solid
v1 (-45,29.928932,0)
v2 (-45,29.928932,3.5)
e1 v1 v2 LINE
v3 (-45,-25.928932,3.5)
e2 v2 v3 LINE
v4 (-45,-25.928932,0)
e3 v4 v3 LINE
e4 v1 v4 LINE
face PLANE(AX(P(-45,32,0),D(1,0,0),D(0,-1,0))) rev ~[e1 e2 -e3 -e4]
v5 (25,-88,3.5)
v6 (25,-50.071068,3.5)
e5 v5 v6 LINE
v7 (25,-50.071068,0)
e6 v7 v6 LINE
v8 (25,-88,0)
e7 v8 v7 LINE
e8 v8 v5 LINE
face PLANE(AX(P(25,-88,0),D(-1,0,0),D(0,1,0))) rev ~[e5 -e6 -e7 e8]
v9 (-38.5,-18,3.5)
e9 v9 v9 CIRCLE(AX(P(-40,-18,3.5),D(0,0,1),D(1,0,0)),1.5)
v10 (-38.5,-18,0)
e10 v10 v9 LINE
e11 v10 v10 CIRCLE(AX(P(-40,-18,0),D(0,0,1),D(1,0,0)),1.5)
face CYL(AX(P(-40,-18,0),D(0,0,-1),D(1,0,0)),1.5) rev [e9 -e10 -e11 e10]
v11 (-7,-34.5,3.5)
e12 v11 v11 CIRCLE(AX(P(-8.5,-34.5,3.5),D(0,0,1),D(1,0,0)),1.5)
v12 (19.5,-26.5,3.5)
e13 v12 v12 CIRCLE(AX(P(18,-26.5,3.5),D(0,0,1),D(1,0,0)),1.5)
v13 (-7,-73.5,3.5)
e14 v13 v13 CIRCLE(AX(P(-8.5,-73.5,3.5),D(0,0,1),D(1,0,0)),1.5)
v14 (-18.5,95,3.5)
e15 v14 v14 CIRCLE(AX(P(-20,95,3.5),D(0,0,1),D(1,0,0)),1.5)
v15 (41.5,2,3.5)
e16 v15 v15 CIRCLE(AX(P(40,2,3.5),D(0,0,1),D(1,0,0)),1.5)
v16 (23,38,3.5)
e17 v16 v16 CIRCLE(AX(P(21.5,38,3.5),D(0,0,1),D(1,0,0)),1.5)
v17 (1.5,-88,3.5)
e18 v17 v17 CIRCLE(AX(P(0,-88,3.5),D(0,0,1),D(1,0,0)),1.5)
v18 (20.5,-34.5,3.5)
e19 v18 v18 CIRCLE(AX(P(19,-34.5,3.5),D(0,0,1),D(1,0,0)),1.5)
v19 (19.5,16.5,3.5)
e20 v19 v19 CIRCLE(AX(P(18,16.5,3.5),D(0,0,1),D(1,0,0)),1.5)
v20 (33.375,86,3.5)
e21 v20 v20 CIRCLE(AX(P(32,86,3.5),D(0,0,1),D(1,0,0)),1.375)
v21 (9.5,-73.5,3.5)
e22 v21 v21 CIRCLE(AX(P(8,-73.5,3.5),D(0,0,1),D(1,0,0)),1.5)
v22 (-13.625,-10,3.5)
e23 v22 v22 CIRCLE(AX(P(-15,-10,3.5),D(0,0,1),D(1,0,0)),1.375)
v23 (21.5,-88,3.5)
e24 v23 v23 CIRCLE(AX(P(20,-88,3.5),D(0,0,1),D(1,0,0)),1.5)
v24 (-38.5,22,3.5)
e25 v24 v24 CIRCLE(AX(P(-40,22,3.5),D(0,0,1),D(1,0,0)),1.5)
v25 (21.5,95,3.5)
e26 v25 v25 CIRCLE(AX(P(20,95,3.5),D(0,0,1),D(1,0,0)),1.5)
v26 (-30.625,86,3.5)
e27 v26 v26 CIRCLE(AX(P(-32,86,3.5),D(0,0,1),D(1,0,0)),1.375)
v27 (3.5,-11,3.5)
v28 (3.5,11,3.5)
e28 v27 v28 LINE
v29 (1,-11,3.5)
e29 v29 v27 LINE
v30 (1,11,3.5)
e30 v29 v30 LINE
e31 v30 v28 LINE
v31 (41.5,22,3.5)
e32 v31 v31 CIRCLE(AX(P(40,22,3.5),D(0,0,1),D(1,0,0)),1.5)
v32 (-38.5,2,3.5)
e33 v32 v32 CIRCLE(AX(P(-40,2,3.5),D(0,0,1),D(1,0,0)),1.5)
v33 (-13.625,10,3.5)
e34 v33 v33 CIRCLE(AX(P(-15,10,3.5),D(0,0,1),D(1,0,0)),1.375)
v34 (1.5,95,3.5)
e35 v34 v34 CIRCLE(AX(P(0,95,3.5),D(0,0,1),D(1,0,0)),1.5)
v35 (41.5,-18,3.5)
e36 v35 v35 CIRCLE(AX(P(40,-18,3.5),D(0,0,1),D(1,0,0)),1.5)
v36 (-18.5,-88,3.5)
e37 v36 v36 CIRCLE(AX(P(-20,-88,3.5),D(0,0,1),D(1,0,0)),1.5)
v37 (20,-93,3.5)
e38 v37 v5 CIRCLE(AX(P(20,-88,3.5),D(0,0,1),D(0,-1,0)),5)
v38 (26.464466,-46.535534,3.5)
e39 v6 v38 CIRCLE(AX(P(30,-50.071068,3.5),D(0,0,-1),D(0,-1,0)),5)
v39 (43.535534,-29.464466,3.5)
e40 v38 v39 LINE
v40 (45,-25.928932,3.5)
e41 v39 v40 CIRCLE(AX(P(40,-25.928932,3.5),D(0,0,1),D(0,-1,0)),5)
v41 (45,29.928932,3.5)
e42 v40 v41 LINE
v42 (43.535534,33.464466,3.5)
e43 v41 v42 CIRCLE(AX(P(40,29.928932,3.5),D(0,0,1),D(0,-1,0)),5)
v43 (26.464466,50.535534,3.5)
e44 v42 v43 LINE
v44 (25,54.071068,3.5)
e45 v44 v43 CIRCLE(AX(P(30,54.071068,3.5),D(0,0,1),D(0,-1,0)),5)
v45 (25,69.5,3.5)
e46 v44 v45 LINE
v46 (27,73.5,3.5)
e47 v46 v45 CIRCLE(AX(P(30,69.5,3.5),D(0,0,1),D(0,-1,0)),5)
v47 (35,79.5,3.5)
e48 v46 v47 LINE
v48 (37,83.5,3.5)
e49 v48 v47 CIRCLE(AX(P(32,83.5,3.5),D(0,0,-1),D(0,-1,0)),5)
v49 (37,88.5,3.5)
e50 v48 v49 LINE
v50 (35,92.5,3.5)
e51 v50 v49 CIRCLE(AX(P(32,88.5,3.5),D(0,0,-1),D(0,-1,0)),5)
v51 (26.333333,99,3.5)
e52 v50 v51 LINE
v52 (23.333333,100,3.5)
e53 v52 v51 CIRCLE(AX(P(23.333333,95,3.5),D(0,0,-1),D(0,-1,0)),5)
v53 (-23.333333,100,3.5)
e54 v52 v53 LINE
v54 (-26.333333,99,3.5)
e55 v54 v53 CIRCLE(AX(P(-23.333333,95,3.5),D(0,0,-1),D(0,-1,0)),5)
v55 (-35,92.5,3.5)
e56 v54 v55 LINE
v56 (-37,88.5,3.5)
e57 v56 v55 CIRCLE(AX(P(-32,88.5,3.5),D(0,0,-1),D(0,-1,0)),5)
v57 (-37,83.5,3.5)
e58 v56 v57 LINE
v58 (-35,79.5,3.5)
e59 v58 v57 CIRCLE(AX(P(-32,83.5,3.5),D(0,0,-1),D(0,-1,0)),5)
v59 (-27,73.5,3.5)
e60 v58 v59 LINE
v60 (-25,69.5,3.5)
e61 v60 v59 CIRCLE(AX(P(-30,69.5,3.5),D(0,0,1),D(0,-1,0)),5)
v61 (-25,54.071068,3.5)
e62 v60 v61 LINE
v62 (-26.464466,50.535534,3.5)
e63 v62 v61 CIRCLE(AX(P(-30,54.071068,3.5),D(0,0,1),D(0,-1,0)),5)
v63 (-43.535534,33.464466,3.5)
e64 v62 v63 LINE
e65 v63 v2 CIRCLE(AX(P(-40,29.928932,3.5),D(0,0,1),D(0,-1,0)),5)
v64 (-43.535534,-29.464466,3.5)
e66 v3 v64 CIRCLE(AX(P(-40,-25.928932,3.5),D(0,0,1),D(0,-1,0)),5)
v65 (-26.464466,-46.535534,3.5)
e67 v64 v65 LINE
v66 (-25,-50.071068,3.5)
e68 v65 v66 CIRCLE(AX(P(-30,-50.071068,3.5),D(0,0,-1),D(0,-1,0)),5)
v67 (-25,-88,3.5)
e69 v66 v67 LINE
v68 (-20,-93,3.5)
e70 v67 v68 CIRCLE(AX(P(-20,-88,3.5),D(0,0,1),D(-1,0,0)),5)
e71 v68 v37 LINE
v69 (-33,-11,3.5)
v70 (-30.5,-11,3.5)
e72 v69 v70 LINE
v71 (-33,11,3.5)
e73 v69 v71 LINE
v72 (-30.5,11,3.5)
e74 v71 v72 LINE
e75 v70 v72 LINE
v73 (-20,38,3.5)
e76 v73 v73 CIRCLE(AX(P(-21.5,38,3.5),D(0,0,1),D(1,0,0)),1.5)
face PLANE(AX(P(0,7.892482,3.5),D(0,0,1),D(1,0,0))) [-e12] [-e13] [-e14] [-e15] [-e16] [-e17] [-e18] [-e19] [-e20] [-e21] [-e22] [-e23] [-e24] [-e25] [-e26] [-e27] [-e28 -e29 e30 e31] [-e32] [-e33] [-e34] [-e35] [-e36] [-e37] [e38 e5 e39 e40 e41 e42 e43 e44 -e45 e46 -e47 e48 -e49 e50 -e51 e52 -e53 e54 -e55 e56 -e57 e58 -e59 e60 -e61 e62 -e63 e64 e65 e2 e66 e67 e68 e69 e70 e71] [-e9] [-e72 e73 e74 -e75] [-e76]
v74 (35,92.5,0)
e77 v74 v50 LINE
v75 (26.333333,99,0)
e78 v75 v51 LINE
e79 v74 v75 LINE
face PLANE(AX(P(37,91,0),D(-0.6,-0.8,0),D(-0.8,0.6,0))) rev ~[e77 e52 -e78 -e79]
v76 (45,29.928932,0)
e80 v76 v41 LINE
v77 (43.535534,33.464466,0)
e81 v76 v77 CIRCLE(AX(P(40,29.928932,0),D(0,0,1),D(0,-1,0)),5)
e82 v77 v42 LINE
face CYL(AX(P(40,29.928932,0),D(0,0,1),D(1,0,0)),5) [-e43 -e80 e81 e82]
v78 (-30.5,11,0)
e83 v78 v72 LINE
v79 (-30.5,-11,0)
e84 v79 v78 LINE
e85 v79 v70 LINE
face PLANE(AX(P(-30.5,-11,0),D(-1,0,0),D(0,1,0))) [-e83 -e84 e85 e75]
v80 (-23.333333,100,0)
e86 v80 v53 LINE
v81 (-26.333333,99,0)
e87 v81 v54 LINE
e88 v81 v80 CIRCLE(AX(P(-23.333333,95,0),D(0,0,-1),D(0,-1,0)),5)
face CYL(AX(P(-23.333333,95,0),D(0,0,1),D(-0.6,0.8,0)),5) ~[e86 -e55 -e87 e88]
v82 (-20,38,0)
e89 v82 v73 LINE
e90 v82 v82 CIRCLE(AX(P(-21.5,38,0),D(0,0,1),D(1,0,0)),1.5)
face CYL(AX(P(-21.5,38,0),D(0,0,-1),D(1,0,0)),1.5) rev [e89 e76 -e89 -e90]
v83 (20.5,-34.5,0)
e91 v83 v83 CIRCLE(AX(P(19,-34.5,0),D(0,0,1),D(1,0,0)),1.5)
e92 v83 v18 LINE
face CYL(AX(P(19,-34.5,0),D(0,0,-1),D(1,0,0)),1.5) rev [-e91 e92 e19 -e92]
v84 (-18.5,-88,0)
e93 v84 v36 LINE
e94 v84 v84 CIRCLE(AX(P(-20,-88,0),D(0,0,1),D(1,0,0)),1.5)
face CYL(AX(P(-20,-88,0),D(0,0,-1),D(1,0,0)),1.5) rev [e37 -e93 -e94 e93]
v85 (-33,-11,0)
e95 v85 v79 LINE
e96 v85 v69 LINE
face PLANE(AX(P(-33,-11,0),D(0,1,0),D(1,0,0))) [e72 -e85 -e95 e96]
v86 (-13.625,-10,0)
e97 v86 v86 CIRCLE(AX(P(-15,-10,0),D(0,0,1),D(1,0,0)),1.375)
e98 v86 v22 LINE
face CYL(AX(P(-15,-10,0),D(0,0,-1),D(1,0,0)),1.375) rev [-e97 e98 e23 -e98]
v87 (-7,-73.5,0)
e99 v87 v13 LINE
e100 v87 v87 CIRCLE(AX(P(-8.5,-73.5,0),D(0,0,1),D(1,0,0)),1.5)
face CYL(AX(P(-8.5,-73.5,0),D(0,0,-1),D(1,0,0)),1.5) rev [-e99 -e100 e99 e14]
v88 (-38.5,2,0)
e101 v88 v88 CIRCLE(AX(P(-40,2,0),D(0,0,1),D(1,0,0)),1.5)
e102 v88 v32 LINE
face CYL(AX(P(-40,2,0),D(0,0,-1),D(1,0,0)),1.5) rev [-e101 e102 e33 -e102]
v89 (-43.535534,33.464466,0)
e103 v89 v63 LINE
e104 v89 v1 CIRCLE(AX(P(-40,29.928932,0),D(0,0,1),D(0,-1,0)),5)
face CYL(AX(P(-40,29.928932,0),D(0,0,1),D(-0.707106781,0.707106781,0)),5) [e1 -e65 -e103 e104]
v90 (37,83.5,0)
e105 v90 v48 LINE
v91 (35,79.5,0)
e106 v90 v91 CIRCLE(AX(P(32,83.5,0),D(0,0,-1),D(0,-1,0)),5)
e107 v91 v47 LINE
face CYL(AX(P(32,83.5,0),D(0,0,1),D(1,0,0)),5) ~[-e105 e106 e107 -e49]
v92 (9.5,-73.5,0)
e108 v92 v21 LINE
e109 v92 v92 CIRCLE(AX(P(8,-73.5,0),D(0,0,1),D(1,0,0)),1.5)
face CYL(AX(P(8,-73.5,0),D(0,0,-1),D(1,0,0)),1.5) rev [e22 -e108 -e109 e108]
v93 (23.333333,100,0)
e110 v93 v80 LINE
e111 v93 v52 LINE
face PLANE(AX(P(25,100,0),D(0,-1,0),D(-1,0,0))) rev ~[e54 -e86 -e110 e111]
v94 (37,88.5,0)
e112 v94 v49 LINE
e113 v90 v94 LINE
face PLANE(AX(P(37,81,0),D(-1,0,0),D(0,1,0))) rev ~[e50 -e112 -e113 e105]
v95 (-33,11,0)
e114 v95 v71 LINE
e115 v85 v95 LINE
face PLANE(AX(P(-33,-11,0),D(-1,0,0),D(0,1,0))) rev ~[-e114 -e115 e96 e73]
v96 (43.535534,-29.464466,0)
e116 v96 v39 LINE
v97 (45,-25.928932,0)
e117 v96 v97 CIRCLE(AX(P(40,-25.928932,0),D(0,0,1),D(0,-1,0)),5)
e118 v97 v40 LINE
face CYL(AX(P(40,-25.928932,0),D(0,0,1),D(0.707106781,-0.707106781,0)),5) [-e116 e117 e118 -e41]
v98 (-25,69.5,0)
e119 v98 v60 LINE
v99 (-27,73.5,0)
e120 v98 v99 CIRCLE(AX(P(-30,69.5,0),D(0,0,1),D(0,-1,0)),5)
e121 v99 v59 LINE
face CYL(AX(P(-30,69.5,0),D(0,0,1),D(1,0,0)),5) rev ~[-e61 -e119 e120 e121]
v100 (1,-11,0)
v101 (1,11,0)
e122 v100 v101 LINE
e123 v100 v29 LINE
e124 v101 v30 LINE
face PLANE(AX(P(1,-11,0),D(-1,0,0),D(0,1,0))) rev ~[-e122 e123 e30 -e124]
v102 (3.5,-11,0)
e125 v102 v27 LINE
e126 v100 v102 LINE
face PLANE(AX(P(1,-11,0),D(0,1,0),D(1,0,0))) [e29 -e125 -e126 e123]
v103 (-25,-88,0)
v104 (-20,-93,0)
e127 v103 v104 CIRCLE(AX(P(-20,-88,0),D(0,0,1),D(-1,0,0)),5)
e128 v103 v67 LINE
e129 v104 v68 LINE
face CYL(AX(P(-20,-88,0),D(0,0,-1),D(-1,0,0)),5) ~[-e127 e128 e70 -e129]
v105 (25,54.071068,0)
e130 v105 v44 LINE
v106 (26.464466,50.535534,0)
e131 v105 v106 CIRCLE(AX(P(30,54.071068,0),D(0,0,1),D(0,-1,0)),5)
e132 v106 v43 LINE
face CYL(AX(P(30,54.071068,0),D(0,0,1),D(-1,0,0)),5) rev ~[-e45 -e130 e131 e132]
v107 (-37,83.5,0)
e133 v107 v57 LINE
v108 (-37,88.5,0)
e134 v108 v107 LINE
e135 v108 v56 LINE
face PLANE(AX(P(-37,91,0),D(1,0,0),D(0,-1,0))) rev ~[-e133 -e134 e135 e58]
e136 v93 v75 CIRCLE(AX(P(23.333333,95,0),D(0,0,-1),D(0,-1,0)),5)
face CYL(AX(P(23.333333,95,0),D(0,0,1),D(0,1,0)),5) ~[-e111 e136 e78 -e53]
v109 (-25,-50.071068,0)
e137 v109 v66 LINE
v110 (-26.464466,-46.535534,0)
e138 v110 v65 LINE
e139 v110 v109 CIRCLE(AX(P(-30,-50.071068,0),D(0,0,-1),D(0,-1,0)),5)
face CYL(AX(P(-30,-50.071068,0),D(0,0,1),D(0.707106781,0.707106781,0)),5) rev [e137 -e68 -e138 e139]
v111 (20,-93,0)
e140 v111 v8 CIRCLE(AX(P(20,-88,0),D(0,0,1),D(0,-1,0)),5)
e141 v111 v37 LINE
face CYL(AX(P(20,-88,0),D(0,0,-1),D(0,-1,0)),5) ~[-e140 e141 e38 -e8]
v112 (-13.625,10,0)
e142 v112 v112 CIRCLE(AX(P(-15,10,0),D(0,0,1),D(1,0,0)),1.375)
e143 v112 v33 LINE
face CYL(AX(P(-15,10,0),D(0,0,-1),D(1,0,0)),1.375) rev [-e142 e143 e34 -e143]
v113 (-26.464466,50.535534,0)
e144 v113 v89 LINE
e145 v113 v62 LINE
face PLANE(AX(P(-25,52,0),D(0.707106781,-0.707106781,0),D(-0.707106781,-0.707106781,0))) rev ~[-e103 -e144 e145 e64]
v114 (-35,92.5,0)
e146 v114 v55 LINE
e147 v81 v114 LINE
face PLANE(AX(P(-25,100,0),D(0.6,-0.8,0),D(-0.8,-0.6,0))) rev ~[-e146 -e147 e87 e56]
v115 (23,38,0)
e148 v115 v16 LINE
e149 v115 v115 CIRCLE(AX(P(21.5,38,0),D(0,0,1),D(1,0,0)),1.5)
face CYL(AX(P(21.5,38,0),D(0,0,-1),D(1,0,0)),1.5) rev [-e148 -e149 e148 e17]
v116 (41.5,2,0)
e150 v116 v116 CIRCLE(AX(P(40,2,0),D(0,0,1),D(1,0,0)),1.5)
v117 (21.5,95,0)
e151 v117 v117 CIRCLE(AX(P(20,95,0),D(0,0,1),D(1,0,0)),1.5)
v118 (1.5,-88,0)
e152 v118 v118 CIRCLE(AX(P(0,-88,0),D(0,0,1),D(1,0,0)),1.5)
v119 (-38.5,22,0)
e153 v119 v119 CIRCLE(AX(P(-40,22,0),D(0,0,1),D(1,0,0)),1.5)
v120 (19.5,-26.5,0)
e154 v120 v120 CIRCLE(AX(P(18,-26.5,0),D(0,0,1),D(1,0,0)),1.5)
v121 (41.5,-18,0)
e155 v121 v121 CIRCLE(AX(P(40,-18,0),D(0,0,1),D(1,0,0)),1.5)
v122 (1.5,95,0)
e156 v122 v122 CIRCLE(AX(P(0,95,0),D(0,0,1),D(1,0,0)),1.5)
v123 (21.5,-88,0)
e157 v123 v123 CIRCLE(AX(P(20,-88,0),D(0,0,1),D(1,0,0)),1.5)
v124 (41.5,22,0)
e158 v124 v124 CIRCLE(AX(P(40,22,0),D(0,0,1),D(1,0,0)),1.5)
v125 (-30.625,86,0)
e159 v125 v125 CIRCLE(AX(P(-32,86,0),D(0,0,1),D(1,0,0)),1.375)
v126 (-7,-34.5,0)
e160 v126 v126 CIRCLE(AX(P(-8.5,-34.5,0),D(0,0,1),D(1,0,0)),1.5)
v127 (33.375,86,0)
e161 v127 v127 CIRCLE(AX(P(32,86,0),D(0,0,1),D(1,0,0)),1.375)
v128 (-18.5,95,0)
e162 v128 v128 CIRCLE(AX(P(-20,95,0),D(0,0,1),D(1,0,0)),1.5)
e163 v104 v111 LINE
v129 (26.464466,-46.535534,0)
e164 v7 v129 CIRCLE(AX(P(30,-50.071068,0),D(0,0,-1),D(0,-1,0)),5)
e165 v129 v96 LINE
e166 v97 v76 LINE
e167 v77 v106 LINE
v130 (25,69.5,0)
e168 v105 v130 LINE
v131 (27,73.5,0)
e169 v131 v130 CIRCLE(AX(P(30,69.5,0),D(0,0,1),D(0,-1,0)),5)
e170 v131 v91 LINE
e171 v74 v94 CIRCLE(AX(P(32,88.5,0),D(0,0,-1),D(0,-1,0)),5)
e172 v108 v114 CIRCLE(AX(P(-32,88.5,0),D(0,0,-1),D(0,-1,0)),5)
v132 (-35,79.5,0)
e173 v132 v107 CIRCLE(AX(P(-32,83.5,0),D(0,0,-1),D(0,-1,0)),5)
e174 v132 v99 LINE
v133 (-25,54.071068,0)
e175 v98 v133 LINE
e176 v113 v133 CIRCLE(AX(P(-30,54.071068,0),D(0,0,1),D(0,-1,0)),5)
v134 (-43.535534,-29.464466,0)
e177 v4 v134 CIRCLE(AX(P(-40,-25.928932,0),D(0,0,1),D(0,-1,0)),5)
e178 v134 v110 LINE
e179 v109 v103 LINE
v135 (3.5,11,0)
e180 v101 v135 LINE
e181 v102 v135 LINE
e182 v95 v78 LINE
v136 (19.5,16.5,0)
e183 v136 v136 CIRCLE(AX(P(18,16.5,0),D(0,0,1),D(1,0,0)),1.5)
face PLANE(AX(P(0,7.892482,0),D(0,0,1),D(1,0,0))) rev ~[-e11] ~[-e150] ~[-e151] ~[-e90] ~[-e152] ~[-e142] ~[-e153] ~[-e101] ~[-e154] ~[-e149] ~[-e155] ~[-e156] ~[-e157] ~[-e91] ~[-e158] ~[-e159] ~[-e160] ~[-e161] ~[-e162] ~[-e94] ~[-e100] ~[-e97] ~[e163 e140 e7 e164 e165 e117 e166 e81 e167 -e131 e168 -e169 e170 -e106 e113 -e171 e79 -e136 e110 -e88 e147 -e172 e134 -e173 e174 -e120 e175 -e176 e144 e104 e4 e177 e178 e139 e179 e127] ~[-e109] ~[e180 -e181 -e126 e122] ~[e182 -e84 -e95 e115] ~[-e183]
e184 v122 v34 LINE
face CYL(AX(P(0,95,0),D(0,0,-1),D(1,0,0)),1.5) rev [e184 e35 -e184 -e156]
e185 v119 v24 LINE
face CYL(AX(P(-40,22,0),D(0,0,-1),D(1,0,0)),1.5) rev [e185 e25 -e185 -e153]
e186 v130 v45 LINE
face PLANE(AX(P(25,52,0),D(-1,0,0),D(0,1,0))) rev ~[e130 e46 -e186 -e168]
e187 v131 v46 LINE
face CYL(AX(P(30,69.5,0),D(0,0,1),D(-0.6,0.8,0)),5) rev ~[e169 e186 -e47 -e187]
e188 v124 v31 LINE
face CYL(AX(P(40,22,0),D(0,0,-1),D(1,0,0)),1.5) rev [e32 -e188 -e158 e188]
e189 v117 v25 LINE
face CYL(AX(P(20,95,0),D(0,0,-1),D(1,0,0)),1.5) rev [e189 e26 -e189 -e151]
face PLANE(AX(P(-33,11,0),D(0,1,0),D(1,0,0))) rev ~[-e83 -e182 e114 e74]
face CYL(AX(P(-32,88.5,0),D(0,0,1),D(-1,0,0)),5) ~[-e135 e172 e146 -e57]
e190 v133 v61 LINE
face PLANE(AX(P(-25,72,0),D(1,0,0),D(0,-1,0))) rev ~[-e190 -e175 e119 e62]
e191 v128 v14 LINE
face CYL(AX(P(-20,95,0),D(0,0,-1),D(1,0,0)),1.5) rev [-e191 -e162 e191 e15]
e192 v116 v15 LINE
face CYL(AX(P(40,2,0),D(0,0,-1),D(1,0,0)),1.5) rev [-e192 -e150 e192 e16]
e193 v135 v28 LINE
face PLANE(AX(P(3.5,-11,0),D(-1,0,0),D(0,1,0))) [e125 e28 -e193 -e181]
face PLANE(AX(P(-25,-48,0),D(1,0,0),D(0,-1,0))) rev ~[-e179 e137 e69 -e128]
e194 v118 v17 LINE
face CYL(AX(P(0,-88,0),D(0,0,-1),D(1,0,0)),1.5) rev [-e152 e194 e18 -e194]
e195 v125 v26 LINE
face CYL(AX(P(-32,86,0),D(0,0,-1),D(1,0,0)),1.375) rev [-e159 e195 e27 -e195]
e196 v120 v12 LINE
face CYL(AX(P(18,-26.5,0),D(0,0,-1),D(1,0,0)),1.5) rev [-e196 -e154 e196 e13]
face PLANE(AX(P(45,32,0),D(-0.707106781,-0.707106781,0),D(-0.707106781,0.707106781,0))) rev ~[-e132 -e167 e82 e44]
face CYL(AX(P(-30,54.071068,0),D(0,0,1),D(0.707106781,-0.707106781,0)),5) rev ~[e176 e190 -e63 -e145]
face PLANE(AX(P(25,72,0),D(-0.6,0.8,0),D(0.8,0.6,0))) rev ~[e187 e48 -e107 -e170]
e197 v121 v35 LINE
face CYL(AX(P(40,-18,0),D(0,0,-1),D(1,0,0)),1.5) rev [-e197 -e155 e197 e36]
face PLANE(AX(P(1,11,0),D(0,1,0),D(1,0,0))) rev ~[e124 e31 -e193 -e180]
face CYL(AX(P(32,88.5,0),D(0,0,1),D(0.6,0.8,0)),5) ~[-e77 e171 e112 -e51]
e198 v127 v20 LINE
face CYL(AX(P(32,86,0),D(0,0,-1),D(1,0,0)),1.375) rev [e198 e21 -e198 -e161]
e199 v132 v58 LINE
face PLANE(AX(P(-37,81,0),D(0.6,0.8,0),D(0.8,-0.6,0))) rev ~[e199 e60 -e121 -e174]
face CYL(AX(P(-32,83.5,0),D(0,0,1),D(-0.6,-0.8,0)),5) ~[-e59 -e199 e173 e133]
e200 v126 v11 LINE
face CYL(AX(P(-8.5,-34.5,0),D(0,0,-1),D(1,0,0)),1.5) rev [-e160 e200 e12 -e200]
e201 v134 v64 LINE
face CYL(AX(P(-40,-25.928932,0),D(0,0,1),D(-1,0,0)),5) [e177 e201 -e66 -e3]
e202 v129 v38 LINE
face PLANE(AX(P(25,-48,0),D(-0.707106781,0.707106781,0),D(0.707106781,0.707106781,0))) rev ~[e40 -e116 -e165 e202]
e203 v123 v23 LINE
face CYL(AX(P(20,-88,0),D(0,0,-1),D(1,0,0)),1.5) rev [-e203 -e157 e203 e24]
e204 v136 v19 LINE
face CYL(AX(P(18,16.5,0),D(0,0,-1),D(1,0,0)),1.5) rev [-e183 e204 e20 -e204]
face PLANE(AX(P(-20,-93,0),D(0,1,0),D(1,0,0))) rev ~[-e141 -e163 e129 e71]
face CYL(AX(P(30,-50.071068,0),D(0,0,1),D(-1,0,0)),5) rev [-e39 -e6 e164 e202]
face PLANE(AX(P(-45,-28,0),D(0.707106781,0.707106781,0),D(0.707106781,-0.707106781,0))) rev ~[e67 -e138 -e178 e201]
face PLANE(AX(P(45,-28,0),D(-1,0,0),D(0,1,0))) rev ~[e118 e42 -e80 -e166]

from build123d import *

# Parameters (mm, degrees)
F0_R     = 1.5
F0_W     = 2.5
F0_H     = 22
F0_R_2   = 1.375
F1_DEPTH = 3.5
F2_R     = 5


# Not quite as in the source:
# - a feature names something its author has since deleted; it is built from what else it names


with BuildPart() as f1:
    # F0 (on Top) → F1 (new body)
    with BuildSketch(Plane.XY):
        with BuildLine():
            Line((-25, 52), (-45, 32))
            Line((-45, 32), (-45, -28))
            Line((-45, -28), (-25, -48))
            Line((-25, -48), (-25, -88))
            ThreePointArc((-25, -88), (-23.5355339059, -91.5355339059), (-20, -93))
            Line((-20, -93), (20, -93))
            ThreePointArc((20, -93), (23.5355339059, -91.5355339059), (25, -88))
            Line((25, -88), (25, -48))
            Line((25, -48), (45, -28))
            Line((45, -28), (45, 32))
            Line((45, 32), (25, 52))
            Line((25, 52), (25, 72))
            Line((25, 72), (37, 81))
            Line((37, 81), (37, 91))
            Line((37, 91), (25, 100))
            Line((25, 100), (-25, 100))
            Line((-25, 100), (-37, 91))
            Line((-37, 91), (-37, 81))
            Line((-37, 81), (-25, 72))
            Line((-25, 72), (-25, 52))
        make_face()
        with Locations((-20, -88)):
            Circle(F0_R, mode=Mode.SUBTRACT)
        with Locations((-8.5, -73.5)):
            Circle(F0_R, mode=Mode.SUBTRACT)
        with Locations((-40, -18)):
            Circle(F0_R, mode=Mode.SUBTRACT)
        with Locations((-40, 2)):
            Circle(F0_R, mode=Mode.SUBTRACT)
        with Locations((-31.75, 0)):
            Rectangle(F0_W, F0_H, mode=Mode.SUBTRACT)
        with Locations((-8.5, -34.5)):
            Circle(F0_R, mode=Mode.SUBTRACT)
        with Locations((-15, -10)):
            Circle(F0_R_2, mode=Mode.SUBTRACT)
        with Locations((0, -88)):
            Circle(F0_R, mode=Mode.SUBTRACT)
        with Locations((8, -73.5)):
            Circle(F0_R, mode=Mode.SUBTRACT)
        with Locations((20, -88)):
            Circle(F0_R, mode=Mode.SUBTRACT)
        with Locations((19, -34.5)):
            Circle(F0_R, mode=Mode.SUBTRACT)
        with Locations((18, -26.5)):
            Circle(F0_R, mode=Mode.SUBTRACT)
        with Locations((2.25, 0)):
            Rectangle(F0_W, F0_H, mode=Mode.SUBTRACT)
        with Locations((40, -18)):
            Circle(F0_R, mode=Mode.SUBTRACT)
        with Locations((40, 2)):
            Circle(F0_R, mode=Mode.SUBTRACT)
        with Locations((-40, 22)):
            Circle(F0_R, mode=Mode.SUBTRACT)
        with Locations((-15, 10)):
            Circle(F0_R_2, mode=Mode.SUBTRACT)
        with Locations((-21.5, 38)):
            Circle(F0_R, mode=Mode.SUBTRACT)
        with Locations((-32, 86)):
            Circle(F0_R_2, mode=Mode.SUBTRACT)
        with Locations((-20, 95)):
            Circle(F0_R, mode=Mode.SUBTRACT)
        with Locations((18, 16.5)):
            Circle(F0_R, mode=Mode.SUBTRACT)
        with Locations((21.5, 38)):
            Circle(F0_R, mode=Mode.SUBTRACT)
        with Locations((40, 22)):
            Circle(F0_R, mode=Mode.SUBTRACT)
        with Locations((0, 95)):
            Circle(F0_R, mode=Mode.SUBTRACT)
        with Locations((20, 95)):
            Circle(F0_R, mode=Mode.SUBTRACT)
        with Locations((32, 86)):
            Circle(F0_R_2, mode=Mode.SUBTRACT)
    extrude(amount=F1_DEPTH)

    # F2
    f2_edges = [f1.edges().sort_by_distance(p)[0] for p in [
        (-45, -28, 1.75),
        (-25, -48, 1.75),
        (25, -48, 1.75),
        (45, -28, 1.75),
        (45, 32, 1.75),
        (25, 52, 1.75),
        (25, 72, 1.75),
        (-25, 52, 1.75),
        (-45, 32, 1.75),
        (-25, 72, 1.75),
        (-37, 81, 1.75),
        (-37, 91, 1.75),
        (-25, 100, 1.75),
        (25, 100, 1.75),
        (37, 91, 1.75),
        (37, 81, 1.75),
    ]]
    fillet(f2_edges, radius=F2_R)


solid = f1.part
